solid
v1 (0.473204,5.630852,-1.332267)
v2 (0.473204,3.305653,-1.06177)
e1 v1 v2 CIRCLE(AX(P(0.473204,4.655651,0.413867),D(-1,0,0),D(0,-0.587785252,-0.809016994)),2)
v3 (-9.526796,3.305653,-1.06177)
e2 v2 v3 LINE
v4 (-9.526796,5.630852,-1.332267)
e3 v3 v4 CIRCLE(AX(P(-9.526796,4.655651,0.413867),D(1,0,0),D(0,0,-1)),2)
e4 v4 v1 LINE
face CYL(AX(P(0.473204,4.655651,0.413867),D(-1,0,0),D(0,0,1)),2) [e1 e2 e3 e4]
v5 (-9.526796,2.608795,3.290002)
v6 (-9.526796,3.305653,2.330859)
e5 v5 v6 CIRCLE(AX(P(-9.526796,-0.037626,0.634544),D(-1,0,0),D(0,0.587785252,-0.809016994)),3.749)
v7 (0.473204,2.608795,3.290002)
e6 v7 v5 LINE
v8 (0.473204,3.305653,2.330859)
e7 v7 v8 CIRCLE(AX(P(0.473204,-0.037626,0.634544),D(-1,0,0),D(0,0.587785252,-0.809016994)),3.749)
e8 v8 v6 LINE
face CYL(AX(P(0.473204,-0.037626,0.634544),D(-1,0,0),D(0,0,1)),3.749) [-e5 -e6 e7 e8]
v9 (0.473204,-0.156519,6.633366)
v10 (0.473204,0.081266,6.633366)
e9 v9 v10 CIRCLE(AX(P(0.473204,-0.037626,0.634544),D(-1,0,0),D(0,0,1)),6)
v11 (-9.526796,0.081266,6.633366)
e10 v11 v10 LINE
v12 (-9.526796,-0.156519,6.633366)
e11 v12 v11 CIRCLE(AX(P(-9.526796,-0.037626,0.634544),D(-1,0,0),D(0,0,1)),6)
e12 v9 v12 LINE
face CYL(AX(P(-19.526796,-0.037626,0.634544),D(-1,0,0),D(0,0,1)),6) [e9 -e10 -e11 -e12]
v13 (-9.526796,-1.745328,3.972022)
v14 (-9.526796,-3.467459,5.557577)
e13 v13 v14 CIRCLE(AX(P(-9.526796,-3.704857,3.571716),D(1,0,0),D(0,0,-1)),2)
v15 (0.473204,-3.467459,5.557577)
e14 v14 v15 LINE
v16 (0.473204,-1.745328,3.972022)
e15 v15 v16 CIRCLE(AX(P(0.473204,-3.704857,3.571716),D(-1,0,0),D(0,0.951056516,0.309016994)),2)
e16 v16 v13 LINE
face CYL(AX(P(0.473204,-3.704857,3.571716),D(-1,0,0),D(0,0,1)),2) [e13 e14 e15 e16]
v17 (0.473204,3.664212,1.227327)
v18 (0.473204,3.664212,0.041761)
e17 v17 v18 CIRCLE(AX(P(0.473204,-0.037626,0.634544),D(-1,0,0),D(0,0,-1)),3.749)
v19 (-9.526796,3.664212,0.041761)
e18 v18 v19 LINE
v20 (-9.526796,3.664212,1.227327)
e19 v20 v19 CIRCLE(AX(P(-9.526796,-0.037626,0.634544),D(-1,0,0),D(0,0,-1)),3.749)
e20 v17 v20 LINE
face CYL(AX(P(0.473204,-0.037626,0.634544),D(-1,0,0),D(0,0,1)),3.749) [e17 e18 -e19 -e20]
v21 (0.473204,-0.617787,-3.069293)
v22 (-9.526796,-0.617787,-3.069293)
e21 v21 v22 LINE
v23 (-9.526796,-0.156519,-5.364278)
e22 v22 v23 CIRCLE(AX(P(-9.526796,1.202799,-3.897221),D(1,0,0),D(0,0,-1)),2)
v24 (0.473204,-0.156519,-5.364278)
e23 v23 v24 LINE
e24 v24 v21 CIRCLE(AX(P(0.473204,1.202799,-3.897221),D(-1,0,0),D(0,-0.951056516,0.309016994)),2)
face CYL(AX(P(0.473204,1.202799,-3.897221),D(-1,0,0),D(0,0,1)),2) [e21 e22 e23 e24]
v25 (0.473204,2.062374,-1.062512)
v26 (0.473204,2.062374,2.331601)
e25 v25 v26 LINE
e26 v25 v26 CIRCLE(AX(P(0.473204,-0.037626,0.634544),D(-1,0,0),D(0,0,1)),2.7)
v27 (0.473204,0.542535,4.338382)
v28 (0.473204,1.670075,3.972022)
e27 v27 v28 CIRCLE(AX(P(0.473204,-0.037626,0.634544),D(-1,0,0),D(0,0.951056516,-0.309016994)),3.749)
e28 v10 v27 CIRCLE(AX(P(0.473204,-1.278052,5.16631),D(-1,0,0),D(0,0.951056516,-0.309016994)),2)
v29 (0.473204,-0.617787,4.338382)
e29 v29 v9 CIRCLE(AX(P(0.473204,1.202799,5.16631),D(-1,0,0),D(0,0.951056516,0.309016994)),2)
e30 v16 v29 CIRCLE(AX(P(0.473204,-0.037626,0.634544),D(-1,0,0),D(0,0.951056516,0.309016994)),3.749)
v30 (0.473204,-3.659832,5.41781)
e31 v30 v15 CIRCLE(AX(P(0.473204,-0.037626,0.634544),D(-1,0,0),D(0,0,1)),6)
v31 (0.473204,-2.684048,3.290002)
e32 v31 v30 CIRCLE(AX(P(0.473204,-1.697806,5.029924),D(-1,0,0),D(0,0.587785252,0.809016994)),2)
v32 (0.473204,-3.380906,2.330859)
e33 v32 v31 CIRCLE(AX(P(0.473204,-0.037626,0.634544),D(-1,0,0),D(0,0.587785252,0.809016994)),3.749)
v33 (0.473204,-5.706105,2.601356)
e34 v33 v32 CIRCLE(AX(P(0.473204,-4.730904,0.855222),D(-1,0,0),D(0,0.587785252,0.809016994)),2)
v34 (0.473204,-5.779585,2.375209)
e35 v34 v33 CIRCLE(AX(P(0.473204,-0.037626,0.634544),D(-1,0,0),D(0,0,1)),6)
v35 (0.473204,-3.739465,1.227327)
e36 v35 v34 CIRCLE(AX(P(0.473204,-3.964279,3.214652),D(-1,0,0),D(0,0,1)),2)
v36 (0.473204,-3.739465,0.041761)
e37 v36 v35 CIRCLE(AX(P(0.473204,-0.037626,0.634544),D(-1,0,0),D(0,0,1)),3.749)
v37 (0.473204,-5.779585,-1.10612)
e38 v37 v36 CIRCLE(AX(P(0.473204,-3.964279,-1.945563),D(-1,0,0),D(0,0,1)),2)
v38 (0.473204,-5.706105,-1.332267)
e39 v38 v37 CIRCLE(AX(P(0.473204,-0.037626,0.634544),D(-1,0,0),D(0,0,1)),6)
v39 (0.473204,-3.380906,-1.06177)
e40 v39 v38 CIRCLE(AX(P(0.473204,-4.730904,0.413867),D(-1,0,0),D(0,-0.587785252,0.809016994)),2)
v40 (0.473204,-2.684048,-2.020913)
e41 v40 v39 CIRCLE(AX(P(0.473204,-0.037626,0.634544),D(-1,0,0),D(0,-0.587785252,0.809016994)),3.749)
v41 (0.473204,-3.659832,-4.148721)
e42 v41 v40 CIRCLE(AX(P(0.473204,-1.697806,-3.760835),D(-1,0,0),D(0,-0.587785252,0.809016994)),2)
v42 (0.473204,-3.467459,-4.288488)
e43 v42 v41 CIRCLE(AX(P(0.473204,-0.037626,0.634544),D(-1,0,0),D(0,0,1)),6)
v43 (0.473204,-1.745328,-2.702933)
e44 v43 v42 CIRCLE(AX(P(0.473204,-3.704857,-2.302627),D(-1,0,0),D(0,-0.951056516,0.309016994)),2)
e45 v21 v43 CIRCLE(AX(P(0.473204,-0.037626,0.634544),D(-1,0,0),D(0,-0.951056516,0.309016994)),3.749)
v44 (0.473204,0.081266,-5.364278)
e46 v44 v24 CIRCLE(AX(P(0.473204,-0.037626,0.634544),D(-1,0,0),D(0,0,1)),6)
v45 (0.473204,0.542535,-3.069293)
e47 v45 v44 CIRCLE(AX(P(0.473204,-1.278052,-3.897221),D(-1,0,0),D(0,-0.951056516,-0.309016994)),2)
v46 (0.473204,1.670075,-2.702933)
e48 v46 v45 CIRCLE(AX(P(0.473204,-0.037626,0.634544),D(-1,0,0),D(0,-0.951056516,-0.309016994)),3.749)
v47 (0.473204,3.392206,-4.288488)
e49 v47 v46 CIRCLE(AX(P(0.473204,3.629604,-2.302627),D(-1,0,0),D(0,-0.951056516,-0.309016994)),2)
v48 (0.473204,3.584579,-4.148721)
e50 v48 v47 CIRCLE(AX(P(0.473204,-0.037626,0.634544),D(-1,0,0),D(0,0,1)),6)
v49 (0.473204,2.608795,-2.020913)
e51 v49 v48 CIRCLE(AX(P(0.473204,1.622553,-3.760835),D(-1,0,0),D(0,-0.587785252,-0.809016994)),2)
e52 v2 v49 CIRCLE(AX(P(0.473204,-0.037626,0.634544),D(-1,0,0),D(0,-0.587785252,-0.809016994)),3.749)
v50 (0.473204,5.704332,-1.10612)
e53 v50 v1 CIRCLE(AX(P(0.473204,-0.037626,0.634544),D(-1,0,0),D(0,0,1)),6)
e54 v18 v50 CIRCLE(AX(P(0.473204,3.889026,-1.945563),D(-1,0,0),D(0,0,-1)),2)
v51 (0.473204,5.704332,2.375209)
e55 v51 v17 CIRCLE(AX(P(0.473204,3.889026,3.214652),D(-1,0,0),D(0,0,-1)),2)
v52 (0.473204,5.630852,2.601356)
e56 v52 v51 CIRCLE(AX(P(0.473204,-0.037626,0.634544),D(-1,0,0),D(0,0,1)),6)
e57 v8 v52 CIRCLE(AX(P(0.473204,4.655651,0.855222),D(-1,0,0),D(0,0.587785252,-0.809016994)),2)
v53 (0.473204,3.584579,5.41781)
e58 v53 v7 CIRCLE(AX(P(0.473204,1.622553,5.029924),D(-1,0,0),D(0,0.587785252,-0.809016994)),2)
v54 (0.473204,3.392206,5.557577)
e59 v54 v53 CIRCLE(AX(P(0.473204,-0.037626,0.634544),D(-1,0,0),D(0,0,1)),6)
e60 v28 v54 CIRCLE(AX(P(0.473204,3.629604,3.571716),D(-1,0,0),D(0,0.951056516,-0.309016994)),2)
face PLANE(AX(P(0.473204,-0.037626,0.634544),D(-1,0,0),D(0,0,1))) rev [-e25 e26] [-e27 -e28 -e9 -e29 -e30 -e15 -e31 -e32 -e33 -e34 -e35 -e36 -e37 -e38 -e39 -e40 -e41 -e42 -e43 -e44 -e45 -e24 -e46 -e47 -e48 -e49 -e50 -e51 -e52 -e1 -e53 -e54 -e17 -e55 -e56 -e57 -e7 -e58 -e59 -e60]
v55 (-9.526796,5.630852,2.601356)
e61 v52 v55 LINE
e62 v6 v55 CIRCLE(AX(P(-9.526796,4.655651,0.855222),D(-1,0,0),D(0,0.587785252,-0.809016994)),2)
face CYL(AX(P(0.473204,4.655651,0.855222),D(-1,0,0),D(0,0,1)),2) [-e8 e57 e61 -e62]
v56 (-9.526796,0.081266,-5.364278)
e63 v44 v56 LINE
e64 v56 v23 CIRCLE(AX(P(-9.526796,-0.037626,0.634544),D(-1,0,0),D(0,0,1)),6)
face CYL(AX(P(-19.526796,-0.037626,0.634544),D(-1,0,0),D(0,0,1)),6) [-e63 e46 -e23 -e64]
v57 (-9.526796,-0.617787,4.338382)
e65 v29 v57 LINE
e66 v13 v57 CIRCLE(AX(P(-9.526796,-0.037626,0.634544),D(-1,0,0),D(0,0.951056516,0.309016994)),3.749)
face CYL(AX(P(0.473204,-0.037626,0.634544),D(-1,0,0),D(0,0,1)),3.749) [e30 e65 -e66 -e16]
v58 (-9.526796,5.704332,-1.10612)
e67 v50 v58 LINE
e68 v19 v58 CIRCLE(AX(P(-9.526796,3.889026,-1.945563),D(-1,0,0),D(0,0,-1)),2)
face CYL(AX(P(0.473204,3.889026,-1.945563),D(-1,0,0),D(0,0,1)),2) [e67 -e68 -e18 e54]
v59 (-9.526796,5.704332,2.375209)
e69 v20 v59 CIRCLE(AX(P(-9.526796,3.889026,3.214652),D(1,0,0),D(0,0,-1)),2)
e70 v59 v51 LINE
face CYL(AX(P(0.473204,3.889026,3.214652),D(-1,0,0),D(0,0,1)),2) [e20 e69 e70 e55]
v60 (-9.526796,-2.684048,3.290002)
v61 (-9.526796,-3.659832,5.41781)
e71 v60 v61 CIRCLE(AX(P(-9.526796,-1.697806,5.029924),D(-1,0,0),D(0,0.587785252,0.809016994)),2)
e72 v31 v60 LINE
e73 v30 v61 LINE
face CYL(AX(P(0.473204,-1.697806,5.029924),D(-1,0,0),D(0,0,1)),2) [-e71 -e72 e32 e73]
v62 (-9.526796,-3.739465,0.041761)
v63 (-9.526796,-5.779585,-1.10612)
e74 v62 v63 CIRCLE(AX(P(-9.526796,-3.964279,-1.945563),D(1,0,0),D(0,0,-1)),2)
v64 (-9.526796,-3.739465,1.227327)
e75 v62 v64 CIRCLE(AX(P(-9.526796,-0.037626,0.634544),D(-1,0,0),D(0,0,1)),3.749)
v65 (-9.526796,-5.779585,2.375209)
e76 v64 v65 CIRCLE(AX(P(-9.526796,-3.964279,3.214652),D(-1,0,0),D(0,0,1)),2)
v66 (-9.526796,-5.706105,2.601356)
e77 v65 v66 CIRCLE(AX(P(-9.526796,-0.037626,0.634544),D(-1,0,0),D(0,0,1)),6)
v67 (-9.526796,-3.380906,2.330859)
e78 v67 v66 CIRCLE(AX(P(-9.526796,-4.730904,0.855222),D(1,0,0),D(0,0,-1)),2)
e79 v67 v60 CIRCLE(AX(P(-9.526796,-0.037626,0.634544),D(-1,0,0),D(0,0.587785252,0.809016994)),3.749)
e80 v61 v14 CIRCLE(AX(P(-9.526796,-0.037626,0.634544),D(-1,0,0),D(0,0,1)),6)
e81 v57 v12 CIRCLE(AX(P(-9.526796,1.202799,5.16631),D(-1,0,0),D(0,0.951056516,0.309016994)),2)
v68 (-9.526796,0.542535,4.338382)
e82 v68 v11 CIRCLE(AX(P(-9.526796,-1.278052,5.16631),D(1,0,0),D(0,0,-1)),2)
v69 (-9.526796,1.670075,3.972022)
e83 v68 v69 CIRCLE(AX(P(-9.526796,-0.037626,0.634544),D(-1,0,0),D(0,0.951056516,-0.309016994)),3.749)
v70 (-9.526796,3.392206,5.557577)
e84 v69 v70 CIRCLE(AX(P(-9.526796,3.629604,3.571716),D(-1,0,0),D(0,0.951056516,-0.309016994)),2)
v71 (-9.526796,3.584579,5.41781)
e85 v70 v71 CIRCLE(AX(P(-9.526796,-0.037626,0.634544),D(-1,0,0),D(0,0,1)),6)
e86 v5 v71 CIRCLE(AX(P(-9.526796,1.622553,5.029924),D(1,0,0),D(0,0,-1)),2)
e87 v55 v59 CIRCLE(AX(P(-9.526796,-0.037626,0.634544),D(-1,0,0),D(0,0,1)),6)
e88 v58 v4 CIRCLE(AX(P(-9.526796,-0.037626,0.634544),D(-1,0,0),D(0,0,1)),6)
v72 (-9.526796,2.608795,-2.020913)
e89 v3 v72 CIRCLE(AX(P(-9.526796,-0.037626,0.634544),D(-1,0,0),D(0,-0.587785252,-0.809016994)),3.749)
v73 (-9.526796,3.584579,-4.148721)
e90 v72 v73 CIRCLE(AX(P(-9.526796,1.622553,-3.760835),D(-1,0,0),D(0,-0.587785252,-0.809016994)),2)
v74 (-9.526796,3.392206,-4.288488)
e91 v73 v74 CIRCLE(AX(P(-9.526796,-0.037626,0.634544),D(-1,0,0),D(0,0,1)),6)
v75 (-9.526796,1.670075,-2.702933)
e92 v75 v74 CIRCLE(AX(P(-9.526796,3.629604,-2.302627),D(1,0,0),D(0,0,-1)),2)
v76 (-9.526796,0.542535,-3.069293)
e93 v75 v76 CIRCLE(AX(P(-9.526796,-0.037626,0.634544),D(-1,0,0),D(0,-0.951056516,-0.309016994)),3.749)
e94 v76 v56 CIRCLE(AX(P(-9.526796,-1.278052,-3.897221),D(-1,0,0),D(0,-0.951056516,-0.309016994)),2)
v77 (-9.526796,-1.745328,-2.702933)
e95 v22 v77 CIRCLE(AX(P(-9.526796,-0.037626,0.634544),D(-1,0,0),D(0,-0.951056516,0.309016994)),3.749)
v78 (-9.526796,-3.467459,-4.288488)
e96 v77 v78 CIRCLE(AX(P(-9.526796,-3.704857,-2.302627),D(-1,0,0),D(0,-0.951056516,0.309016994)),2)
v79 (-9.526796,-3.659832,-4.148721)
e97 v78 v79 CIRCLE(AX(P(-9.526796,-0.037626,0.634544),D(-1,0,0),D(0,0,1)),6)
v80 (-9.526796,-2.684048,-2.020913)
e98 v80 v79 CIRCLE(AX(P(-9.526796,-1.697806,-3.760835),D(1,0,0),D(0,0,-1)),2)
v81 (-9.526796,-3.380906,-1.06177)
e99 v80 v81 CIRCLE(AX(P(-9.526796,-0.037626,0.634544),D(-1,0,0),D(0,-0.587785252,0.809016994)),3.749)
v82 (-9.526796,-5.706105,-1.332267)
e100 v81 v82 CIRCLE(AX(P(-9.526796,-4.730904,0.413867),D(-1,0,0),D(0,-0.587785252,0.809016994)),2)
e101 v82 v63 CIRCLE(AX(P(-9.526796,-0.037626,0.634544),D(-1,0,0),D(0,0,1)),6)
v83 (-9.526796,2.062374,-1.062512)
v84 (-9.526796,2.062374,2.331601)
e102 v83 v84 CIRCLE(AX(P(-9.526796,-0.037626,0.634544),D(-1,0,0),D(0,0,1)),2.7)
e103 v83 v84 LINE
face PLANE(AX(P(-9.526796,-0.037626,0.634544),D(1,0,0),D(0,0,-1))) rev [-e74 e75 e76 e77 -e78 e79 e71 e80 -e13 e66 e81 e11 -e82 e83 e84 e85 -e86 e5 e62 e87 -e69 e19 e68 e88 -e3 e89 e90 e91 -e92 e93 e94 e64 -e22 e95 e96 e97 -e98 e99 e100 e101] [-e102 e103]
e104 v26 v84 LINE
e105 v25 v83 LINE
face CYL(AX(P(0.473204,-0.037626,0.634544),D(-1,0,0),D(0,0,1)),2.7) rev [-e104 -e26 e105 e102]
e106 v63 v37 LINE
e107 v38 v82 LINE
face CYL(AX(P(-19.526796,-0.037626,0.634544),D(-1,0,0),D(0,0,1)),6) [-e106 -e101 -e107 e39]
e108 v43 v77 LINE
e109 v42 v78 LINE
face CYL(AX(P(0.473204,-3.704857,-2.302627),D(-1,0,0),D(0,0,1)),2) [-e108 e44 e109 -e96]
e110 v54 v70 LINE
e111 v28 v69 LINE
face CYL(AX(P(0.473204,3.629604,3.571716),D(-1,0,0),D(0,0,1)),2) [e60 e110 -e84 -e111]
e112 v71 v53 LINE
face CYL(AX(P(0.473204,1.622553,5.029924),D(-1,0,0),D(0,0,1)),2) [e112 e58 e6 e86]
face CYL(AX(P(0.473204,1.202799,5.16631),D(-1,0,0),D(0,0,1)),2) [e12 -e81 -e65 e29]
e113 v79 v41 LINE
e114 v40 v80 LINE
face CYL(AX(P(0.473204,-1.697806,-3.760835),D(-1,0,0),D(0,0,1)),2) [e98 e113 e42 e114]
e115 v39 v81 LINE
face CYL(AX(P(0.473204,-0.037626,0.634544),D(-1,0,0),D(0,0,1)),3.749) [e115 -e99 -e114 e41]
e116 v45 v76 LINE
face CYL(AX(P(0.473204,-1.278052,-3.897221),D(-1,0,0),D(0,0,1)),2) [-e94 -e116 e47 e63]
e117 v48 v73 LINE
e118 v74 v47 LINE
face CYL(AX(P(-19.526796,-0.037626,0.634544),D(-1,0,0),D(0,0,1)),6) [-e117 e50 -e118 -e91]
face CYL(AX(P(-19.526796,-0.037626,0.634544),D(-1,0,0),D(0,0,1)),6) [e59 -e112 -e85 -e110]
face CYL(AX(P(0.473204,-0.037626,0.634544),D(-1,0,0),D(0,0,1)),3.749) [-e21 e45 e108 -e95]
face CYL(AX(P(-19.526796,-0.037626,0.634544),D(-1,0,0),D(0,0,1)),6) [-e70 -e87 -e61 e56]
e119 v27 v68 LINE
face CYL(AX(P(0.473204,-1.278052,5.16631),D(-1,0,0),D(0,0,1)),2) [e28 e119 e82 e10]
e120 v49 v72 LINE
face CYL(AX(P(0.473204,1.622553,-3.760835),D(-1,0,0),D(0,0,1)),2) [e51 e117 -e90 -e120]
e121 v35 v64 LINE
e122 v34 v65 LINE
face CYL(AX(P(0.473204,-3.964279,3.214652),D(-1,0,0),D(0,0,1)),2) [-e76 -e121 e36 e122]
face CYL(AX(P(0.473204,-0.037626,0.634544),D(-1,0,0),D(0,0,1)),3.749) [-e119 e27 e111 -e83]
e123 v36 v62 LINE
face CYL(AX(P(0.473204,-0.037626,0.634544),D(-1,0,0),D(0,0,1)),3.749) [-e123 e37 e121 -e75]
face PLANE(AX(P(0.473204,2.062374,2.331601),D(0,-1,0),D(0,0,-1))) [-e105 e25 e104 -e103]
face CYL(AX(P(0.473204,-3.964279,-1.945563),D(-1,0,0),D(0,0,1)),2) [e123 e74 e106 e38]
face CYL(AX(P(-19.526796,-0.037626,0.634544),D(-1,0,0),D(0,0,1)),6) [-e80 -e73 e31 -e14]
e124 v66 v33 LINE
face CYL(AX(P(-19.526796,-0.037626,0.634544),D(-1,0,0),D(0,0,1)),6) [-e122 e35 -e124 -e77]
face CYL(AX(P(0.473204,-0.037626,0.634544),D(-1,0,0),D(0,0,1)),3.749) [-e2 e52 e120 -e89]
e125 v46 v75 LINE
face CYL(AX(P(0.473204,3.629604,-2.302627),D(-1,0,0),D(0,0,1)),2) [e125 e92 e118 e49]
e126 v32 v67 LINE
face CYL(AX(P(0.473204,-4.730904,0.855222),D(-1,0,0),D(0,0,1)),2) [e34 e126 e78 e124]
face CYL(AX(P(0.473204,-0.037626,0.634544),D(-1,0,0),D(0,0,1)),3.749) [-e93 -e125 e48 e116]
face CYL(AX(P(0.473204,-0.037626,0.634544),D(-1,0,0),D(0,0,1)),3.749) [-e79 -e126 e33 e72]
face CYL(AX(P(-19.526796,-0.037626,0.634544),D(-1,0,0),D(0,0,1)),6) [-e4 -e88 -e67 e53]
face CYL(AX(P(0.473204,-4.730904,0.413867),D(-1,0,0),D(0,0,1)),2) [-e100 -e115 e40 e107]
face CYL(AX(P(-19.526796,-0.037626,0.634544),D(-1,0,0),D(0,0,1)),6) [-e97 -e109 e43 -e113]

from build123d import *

# Parameters (mm, degrees)
SPUR_START             = -9.526796012
SPUR_GEAR_AM_OUTLINE_R = 2.5
SPUR_GEAR_AM_DEPTH     = 10
SKETCH1_R              = 2.7
CUT_EXTRUDE1_DEPTH     = 14.319939227
BOSS_EXTRUDE1_DEPTH    = 10


# Read off the part's stored shape, not the designer's step: spur gear_am
with BuildPart() as part:
    # spur gear_am outline → spur gear_am (new body)
    with BuildSketch(Plane.YZ.offset(SPUR_START)):
        with BuildLine():
            ThreePointArc((-0.156519062, -5.364277595), (-0.037626451, -5.365455666), (0.081266159, -5.364277595))
            ThreePointArc((0.081266159, -5.364277595), (0.682735226, -4.291319539), (0.542534544, -3.069293435))
            ThreePointArc((0.542534544, -3.069293435), (1.12087826, -2.930966545), (1.670074661, -2.702933442))
            ThreePointArc((1.670074661, -2.702933442), (2.274938849, -3.773981221), (3.392206468, -4.288487876))
            ThreePointArc((3.392206468, -4.288487876), (3.489085062, -4.219557632), (3.584578752, -4.14872123))
            ThreePointArc((3.584578752, -4.14872123), (3.440508527, -2.927145281), (2.608794871, -2.020913288))
            ThreePointArc((2.608794871, -2.020913288), (2.995378261, -1.569062577), (3.305652987, -1.061770376))
            ThreePointArc((3.305652987, -1.061770376), (4.424544483, -1.572735982), (5.630852398, -1.33226718))
            ThreePointArc((5.630852398, -1.33226718), (5.668712646, -1.219557632), (5.704332072, -1.106119996))
            ThreePointArc((5.704332072, -1.106119996), (4.869752484, -0.202526647), (3.664212201, 0.041761415))
            ThreePointArc((3.664212201, 0.041761415), (3.711373549, 0.634544334), (3.664212201, 1.227327254))
            ThreePointArc((3.664212201, 1.227327254), (4.869752484, 1.471615316), (5.704332072, 2.375208665))
            ThreePointArc((5.704332072, 2.375208665), (5.668712646, 2.488646301), (5.630852398, 2.601355849))
            ThreePointArc((5.630852398, 2.601355849), (4.424544483, 2.84182465), (3.305652987, 2.330859045))
            ThreePointArc((3.305652987, 2.330859045), (2.995378261, 2.838151246), (2.608794871, 3.290001957))
            ThreePointArc((2.608794871, 3.290001957), (3.440508527, 4.19623395), (3.584578752, 5.417809899))
            ThreePointArc((3.584578752, 5.417809899), (3.489085062, 5.488646301), (3.392206468, 5.557576545))
            ThreePointArc((3.392206468, 5.557576545), (2.274938849, 5.04306989), (1.670074661, 3.972022111))
            ThreePointArc((1.670074661, 3.972022111), (1.12087826, 4.200055214), (0.542534544, 4.338382103))
            ThreePointArc((0.542534544, 4.338382103), (0.682735226, 5.560408207), (0.081266159, 6.633366264))
            ThreePointArc((0.081266159, 6.633366264), (-0.037626451, 6.634544334), (-0.156519062, 6.633366264))
            ThreePointArc((-0.156519062, 6.633366264), (-0.757988129, 5.560408207), (-0.617787447, 4.338382103))
            ThreePointArc((-0.617787447, 4.338382103), (-1.196131163, 4.200055214), (-1.745327564, 3.972022111))
            ThreePointArc((-1.745327564, 3.972022111), (-2.350191752, 5.04306989), (-3.467459371, 5.557576545))
            ThreePointArc((-3.467459371, 5.557576545), (-3.564337965, 5.488646301), (-3.659831655, 5.417809899))
            ThreePointArc((-3.659831655, 5.417809899), (-3.51576143, 4.19623395), (-2.684047774, 3.290001957))
            ThreePointArc((-2.684047774, 3.290001957), (-3.070631163, 2.838151245), (-3.38090589, 2.330859045))
            ThreePointArc((-3.38090589, 2.330859045), (-4.499797386, 2.84182465), (-5.706105301, 2.601355849))
            ThreePointArc((-5.706105301, 2.601355849), (-5.743965549, 2.488646301), (-5.779584975, 2.375208665))
            ThreePointArc((-5.779584975, 2.375208665), (-4.945005387, 1.471615316), (-3.739465104, 1.227327254))
            ThreePointArc((-3.739465104, 1.227327254), (-3.786626451, 0.634544334), (-3.739465104, 0.041761415))
            ThreePointArc((-3.739465104, 0.041761415), (-4.945005387, -0.202526647), (-5.779584975, -1.106119996))
            ThreePointArc((-5.779584975, -1.106119996), (-5.743965549, -1.219557632), (-5.706105301, -1.33226718))
            ThreePointArc((-5.706105301, -1.33226718), (-4.499797386, -1.572735982), (-3.38090589, -1.061770376))
            ThreePointArc((-3.38090589, -1.061770376), (-3.070631163, -1.569062576), (-2.684047774, -2.020913288))
            ThreePointArc((-2.684047774, -2.020913288), (-3.51576143, -2.927145281), (-3.659831655, -4.14872123))
            ThreePointArc((-3.659831655, -4.14872123), (-3.564337965, -4.219557632), (-3.467459371, -4.288487876))
            ThreePointArc((-3.467459371, -4.288487876), (-2.350191752, -3.773981221), (-1.745327564, -2.702933442))
            ThreePointArc((-1.745327564, -2.702933442), (-1.196131163, -2.930966545), (-0.617787447, -3.069293435))
            ThreePointArc((-0.617787447, -3.069293435), (-0.757988129, -4.291319539), (-0.156519062, -5.364277595))
        make_face()
        with Locations((-0.037626451, 0.634544334)):
            Circle(SPUR_GEAR_AM_OUTLINE_R, mode=Mode.SUBTRACT)
    extrude(amount=SPUR_GEAR_AM_DEPTH)

    # Sketch1 → Cut-Extrude1 (cut, through all)
    with BuildSketch(Plane.ZY.offset(9.526796012)):
        with Locations((0.634544334, -0.037626451)):
            Circle(SKETCH1_R)
    extrude(amount=-CUT_EXTRUDE1_DEPTH, mode=Mode.SUBTRACT)

    # Sketch2 → Boss-Extrude1 (add, through all)
    with BuildSketch(Plane.ZY.offset(9.526796012)):
        with BuildLine():
            Line((2.331600609, 2.062373549), (-1.06251194, 2.062373549))
            ThreePointArc((-1.06251194, 2.062373549), (0.634544334, 2.662373549), (2.331600609, 2.062373549))
        make_face()
    extrude(amount=-BOSS_EXTRUDE1_DEPTH)


solid = part.part
